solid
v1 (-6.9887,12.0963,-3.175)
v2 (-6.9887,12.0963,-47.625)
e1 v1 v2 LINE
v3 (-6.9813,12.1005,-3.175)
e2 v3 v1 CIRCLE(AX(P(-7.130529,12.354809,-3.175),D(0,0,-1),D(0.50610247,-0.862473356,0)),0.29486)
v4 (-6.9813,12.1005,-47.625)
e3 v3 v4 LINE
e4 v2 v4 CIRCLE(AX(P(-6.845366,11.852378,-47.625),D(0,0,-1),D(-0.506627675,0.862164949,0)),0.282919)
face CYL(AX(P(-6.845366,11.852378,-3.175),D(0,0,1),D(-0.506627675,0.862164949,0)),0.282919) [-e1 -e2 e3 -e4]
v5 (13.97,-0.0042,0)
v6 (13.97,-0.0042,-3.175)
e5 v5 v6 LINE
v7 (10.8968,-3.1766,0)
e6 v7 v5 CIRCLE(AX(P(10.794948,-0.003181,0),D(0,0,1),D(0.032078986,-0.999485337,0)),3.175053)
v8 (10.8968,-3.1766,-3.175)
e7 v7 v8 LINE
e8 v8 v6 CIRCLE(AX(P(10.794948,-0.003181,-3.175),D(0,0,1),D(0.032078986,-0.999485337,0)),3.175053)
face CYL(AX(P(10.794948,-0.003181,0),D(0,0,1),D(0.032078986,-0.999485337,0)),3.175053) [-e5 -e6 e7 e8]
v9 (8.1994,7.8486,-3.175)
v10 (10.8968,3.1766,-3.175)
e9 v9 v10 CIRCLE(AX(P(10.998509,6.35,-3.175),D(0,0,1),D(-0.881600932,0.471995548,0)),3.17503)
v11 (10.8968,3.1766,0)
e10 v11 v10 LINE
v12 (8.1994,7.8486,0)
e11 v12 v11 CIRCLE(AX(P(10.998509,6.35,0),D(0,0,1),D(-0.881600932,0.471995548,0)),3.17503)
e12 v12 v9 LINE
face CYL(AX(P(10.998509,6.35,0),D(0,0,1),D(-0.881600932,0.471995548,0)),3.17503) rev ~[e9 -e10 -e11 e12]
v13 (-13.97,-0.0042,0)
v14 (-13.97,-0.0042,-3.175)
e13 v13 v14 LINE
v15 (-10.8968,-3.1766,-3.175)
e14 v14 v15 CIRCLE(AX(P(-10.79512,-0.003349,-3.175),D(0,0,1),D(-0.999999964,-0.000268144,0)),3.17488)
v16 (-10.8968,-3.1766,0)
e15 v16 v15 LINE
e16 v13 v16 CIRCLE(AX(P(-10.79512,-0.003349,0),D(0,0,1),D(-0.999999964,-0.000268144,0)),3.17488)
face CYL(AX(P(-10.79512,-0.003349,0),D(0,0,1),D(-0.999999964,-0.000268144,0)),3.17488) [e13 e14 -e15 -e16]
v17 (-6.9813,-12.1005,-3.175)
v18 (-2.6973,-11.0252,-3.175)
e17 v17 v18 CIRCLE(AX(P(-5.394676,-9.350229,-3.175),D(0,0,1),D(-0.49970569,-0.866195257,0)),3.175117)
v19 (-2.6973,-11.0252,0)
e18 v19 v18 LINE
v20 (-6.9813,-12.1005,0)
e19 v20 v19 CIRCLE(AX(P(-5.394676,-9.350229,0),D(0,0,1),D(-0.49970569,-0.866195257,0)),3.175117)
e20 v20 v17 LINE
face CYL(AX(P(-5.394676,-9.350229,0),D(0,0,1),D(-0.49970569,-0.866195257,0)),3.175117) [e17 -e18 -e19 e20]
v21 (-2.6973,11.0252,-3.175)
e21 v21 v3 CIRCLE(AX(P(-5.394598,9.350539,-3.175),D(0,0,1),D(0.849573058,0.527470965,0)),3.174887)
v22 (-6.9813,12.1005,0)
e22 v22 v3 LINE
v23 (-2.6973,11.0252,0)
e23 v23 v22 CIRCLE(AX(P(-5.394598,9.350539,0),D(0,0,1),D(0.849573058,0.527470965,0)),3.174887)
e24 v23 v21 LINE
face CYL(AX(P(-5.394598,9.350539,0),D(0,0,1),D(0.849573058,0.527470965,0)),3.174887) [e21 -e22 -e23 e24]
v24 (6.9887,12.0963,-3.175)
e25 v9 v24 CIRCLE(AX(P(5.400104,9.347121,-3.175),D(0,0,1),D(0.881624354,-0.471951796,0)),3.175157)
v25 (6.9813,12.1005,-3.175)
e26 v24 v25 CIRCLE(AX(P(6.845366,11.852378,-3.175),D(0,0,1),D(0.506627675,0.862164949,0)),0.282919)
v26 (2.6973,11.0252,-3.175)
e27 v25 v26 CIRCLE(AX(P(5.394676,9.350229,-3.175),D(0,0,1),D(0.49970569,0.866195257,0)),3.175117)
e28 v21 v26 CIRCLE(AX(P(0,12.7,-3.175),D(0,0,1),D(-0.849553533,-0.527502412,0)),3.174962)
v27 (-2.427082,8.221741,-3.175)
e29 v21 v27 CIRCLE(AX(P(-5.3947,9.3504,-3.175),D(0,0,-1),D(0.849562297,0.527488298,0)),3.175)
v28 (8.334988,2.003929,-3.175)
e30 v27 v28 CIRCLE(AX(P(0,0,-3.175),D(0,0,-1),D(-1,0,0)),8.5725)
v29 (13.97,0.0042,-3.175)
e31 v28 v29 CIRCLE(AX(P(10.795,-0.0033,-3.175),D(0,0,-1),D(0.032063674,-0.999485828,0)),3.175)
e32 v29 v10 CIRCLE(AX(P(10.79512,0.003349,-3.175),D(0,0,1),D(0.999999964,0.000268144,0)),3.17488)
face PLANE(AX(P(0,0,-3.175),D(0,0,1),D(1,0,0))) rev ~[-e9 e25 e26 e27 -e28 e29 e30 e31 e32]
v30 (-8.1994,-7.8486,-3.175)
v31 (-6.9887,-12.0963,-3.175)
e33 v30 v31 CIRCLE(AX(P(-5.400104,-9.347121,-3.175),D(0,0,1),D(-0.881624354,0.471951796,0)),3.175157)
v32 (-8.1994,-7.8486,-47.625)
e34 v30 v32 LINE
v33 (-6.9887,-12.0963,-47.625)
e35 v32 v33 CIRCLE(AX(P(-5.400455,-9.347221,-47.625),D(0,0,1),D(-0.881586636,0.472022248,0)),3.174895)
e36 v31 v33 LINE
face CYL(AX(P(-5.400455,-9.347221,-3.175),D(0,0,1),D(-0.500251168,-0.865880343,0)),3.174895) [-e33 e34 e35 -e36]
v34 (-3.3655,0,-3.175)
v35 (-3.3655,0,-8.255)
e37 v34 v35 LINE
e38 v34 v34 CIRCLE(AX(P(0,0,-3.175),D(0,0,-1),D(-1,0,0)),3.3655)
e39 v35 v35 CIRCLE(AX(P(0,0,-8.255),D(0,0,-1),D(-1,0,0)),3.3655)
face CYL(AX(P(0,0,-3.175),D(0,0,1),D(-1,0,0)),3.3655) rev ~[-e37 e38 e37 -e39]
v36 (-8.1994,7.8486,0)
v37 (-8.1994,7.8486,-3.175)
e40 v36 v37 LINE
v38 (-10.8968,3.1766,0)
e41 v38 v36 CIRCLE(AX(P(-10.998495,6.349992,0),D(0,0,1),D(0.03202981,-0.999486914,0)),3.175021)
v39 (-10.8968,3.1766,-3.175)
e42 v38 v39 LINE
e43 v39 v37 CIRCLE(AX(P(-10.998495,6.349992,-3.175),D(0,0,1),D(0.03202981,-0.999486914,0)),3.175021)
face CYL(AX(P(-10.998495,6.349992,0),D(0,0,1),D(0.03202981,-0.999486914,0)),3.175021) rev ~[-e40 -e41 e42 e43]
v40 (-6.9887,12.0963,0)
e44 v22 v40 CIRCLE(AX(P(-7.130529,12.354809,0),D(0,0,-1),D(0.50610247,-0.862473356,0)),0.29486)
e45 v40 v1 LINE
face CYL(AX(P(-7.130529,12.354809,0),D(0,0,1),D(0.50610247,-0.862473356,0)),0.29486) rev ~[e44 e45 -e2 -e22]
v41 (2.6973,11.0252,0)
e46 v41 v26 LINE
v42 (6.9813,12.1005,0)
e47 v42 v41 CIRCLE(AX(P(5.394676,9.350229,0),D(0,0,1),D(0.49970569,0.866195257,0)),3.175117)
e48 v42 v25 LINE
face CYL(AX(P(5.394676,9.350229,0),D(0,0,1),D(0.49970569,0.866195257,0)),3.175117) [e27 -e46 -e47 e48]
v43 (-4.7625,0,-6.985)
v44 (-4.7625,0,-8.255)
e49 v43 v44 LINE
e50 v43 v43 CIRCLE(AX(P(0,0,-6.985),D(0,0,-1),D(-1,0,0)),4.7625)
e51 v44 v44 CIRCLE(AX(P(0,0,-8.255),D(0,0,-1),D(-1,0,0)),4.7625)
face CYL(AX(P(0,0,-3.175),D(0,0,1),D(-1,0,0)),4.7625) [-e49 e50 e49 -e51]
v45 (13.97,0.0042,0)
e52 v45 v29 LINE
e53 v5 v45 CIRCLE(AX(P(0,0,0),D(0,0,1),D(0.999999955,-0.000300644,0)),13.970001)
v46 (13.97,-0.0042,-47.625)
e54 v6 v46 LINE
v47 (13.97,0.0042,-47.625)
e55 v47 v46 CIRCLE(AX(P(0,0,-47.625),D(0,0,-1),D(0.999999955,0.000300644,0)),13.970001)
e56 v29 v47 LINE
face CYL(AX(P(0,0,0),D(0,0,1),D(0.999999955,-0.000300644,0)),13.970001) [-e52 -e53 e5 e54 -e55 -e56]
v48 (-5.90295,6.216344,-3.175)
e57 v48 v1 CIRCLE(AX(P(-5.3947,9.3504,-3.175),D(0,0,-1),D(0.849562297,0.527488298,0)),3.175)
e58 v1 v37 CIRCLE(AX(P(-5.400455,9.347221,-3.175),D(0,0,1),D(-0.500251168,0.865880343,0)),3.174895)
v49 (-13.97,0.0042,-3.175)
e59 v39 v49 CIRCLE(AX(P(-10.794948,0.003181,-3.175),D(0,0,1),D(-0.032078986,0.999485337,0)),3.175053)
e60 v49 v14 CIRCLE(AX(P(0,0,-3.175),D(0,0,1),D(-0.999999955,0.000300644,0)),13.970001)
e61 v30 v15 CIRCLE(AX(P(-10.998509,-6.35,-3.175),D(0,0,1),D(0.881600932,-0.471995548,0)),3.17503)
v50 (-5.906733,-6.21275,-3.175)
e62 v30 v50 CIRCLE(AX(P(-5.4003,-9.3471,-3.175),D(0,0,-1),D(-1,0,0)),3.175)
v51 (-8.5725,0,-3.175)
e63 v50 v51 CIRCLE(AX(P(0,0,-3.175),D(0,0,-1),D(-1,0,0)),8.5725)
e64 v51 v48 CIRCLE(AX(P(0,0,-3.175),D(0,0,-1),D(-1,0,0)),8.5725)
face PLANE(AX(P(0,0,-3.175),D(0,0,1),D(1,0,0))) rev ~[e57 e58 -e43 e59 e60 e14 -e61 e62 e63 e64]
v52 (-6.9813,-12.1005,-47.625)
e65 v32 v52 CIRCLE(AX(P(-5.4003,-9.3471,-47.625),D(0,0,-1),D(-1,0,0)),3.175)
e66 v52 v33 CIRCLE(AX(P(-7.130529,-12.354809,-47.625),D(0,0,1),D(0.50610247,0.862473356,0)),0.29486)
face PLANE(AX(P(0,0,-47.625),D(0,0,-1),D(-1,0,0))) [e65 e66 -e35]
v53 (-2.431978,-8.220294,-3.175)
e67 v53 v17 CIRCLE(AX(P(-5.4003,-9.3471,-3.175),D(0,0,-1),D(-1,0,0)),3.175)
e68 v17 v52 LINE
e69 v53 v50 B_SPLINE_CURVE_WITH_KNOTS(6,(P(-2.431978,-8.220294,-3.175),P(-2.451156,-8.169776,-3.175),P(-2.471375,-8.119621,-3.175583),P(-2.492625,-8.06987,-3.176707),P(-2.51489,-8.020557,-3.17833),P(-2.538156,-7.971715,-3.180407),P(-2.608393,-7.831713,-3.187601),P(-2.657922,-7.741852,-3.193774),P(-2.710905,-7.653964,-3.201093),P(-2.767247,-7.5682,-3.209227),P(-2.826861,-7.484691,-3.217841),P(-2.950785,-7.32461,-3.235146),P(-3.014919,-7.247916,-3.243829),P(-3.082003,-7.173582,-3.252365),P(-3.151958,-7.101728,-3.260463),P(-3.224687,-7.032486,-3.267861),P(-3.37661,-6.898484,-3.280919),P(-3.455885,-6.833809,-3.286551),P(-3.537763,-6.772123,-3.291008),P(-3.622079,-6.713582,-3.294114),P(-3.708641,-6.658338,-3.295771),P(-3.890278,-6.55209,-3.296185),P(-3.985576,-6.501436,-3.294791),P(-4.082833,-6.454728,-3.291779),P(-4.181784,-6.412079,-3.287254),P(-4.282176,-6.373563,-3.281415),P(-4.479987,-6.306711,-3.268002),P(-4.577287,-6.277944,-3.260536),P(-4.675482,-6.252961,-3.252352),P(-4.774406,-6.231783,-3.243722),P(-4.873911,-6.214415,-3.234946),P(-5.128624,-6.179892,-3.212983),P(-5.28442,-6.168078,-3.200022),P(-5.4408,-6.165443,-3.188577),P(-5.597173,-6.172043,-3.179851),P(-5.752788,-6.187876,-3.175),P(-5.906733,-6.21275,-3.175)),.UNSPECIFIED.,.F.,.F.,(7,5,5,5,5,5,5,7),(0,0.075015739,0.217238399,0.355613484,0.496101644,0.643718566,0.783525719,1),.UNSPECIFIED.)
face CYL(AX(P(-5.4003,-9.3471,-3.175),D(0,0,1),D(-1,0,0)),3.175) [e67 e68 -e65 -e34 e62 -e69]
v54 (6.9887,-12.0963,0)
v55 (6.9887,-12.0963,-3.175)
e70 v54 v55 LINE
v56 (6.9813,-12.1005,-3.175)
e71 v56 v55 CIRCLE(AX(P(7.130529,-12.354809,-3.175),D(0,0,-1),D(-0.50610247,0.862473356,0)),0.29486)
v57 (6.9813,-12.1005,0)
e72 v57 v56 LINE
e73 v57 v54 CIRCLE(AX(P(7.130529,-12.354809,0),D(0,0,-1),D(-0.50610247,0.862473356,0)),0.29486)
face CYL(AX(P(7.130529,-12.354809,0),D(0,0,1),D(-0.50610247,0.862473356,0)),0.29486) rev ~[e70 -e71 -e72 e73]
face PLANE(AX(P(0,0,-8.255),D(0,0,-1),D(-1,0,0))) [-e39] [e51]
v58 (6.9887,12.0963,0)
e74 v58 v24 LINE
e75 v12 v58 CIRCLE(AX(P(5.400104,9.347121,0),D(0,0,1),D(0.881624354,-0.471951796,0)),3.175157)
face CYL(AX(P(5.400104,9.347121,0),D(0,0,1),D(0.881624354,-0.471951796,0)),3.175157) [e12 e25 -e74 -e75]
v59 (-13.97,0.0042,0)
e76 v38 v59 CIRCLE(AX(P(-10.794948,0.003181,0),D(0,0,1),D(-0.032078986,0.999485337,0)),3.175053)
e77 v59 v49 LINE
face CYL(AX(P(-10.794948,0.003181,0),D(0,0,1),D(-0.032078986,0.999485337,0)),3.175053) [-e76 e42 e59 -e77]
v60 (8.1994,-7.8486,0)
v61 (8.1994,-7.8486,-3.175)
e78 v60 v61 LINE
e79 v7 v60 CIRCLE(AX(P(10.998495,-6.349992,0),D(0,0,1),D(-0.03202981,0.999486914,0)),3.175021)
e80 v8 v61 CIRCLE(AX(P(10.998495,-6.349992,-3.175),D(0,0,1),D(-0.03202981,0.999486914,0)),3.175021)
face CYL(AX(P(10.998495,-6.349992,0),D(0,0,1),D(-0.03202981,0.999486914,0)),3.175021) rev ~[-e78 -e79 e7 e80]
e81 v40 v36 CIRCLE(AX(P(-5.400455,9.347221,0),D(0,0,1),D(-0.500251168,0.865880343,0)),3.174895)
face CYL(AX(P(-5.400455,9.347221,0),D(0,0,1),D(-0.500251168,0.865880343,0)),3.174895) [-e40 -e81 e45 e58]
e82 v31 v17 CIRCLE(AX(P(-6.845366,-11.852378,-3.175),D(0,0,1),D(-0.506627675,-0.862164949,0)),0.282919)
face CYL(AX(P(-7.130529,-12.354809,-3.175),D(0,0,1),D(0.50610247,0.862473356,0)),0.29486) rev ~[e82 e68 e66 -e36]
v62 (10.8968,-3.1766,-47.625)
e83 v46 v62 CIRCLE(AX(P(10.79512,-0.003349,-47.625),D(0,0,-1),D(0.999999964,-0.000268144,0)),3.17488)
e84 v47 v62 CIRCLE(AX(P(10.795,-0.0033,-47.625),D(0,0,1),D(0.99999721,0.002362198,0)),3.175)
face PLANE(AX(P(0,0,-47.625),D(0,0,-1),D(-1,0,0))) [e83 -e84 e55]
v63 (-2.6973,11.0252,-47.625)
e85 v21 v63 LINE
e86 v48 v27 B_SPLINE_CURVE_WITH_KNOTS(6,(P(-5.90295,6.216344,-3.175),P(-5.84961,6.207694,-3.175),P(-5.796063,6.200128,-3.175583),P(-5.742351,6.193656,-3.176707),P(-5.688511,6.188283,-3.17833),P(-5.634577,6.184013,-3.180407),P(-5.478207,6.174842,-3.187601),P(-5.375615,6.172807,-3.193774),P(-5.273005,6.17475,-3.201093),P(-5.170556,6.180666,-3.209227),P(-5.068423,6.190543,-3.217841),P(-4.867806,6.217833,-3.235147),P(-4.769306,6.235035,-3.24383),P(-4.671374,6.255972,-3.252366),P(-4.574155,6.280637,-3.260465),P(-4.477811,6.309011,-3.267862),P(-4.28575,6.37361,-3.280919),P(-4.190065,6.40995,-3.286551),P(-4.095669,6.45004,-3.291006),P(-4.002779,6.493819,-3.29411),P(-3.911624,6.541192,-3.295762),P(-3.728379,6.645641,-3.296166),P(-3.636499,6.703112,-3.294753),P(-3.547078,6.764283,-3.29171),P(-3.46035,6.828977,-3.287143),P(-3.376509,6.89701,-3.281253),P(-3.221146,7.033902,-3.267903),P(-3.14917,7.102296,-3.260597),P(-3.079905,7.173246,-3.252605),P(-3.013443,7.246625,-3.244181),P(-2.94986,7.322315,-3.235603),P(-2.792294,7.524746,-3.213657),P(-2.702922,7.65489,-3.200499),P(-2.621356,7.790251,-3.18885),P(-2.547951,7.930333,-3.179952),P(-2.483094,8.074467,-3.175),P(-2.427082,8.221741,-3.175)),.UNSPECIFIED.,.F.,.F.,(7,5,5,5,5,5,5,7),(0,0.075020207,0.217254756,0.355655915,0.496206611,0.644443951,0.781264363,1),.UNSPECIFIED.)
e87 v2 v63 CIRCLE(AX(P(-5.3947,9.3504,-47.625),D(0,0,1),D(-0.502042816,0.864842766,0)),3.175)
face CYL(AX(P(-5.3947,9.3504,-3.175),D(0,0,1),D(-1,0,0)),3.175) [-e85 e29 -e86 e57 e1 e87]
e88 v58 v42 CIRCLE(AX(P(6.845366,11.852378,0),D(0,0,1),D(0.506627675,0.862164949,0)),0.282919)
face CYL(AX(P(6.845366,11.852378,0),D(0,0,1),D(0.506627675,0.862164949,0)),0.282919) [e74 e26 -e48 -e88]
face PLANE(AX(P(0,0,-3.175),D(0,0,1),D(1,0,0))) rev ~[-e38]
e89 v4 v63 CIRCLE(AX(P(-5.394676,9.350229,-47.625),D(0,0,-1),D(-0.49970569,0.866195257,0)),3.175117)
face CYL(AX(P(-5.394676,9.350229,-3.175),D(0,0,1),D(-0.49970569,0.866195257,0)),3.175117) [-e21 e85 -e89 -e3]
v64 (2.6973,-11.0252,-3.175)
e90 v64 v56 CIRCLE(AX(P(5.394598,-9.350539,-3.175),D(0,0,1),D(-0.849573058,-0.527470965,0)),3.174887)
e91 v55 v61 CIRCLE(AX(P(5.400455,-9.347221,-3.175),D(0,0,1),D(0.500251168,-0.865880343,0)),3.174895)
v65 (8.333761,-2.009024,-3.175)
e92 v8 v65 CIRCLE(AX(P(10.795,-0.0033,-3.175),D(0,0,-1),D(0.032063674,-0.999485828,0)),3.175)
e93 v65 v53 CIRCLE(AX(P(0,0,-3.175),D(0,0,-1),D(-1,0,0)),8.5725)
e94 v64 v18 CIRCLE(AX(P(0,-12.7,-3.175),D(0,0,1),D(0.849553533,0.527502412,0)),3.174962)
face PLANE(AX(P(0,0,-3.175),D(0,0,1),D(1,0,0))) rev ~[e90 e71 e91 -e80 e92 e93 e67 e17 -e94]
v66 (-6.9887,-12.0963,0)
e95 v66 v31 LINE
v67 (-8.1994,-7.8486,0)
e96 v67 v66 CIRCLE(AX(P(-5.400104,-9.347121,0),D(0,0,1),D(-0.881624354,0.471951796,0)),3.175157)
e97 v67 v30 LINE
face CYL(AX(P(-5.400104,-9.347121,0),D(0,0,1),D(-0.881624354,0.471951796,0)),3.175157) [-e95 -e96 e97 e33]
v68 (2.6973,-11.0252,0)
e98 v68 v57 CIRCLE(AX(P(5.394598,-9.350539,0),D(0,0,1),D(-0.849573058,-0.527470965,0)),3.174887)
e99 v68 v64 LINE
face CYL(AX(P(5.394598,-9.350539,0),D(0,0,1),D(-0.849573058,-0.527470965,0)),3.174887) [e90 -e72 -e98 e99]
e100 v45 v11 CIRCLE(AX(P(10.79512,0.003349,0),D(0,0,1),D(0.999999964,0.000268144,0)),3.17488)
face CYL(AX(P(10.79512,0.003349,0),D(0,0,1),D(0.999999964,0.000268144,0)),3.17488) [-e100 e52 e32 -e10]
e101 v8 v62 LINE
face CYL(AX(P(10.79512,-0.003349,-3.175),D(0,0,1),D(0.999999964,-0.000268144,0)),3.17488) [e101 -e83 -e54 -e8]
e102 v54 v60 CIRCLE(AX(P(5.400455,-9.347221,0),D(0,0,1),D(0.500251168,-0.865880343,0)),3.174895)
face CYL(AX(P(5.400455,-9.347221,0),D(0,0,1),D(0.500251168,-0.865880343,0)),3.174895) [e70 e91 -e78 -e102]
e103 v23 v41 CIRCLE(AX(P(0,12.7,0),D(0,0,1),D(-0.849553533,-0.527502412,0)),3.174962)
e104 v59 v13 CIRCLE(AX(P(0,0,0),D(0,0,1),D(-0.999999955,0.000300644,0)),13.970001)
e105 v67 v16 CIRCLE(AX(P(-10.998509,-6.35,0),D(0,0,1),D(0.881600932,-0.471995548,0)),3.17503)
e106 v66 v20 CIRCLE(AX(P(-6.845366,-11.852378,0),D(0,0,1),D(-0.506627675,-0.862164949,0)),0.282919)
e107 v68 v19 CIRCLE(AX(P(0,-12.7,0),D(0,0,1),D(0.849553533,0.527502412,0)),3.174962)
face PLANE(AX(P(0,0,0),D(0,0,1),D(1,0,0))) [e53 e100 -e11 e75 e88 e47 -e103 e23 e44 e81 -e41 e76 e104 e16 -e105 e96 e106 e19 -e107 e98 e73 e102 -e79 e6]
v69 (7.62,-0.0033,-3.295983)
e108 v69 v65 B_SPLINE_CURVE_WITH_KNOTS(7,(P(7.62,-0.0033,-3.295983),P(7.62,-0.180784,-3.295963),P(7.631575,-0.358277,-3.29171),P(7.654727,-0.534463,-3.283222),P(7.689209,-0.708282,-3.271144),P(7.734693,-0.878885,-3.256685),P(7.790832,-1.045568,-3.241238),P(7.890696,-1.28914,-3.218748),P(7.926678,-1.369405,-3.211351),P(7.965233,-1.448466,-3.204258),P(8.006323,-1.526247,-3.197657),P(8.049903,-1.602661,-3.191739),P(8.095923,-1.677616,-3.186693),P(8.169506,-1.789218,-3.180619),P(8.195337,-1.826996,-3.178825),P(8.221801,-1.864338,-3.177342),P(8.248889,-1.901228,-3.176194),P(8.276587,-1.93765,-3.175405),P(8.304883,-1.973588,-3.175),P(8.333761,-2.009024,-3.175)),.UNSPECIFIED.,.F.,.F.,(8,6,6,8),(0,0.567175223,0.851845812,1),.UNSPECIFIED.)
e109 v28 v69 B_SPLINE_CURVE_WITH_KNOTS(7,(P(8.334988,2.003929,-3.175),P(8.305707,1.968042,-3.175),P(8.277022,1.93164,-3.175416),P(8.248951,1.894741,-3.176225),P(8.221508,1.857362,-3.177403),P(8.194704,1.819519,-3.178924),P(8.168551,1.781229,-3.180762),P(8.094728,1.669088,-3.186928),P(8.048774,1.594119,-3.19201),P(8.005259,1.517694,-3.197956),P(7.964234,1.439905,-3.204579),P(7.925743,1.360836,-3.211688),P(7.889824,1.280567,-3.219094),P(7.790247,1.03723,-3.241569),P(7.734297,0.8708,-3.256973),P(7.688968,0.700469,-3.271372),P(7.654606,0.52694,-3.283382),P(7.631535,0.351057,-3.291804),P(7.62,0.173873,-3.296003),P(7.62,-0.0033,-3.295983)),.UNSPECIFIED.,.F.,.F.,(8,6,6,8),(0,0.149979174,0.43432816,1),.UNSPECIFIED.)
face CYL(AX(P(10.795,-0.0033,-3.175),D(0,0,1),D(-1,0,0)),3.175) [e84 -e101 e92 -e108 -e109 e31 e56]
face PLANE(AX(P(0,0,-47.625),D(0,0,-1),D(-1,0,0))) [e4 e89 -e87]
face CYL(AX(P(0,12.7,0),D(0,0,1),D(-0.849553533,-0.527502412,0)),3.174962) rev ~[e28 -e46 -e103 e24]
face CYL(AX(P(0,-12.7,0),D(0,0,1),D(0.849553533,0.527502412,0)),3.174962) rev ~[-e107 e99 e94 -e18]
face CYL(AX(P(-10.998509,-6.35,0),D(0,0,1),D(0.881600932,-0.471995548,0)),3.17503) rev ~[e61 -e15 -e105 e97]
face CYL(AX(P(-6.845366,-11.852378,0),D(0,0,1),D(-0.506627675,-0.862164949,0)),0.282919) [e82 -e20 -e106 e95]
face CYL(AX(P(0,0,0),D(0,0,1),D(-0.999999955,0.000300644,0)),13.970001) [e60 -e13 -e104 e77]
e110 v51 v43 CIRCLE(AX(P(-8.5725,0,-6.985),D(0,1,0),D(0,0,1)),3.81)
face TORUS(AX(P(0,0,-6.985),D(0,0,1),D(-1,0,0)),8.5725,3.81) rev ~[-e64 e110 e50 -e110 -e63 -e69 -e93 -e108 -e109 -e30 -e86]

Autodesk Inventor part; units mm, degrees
ref_plane "YZ Plane" through (0, 0, 0) normal (1, 0, 0) x (0, 1, 0)
ref_plane "XZ Plane" through (0, 0, 0) normal (0, 1, 0) x (-1, 0, 0)
ref_plane "XY Plane" through (0, 0, 0) normal (0, 0, 1) x (1, 0, 0)
sketch "Sketch2" plane through (0, 0, 0) normal (0, 0, 1) x (1, 0, 0)
  arc A0 (8.1994, 7.8486) -> (6.9887, 12.0963) centre (5.4003, 9.3471) ccw
  arc A1 (6.9887, 12.0963) -> (6.9813, 12.1005) centre (0, 0) ccw
  arc A2 (6.9813, 12.1005) -> (2.6973, 11.0252) centre (5.3947, 9.3504) ccw
  arc A3 (-2.6973, 11.0252) -> (2.6973, 11.0252) centre (0, 12.7) ccw
  arc A4 (-2.6973, 11.0252) -> (-6.9813, 12.1005) centre (-5.3947, 9.3504) ccw
  arc A5 (-6.9813, 12.1005) -> (-6.9887, 12.0963) centre (0, 0) ccw
  arc A6 (-6.9887, 12.0963) -> (-8.1994, 7.8486) centre (-5.4003, 9.3471) ccw
  arc A7 (-10.8968, 3.1766) -> (-8.1994, 7.8486) centre (-10.9985, 6.35) ccw
  arc A8 (-10.8968, 3.1766) -> (-13.97, 0.0042) centre (-10.795, 0.0033) ccw
  arc A9 (-13.97, 0.0042) -> (-13.97, -0.0042) centre (0, 0) ccw
  arc A10 (-13.97, -0.0042) -> (-10.8968, -3.1766) centre (-10.795, -0.0033) ccw
  arc A11 (-8.1994, -7.8486) -> (-10.8968, -3.1766) centre (-10.9985, -6.35) ccw
  arc A12 (-8.1994, -7.8486) -> (-6.9887, -12.0963) centre (-5.4003, -9.3471) ccw
  arc A13 (-6.9887, -12.0963) -> (-6.9813, -12.1005) centre (0, 0) ccw
  arc A14 (-6.9813, -12.1005) -> (-2.6973, -11.0252) centre (-5.3947, -9.3504) ccw
  arc A15 (2.6973, -11.0252) -> (-2.6973, -11.0252) centre (0, -12.7) ccw
  arc A16 (2.6973, -11.0252) -> (6.9813, -12.1005) centre (5.3947, -9.3504) ccw
  arc A17 (6.9813, -12.1005) -> (6.9887, -12.0963) centre (0, 0) ccw
  arc A18 (6.9887, -12.0963) -> (8.1994, -7.8486) centre (5.4003, -9.3471) ccw
  arc A19 (10.8968, -3.1766) -> (8.1994, -7.8486) centre (10.9985, -6.35) ccw
  arc A20 (10.8968, -3.1766) -> (13.97, -0.0042) centre (10.795, -0.0033) ccw
  arc A21 (13.97, -0.0042) -> (13.97, 0.0042) centre (0, 0) ccw
  arc A22 (13.97, 0.0042) -> (10.8968, 3.1766) centre (10.795, 0.0033) ccw
  arc A23 (8.1994, 7.8486) -> (10.8968, 3.1766) centre (10.9985, 6.35) ccw
  circle A24 centre (0, 0) radius 1.5875
extrude "Extrusion1" add sketch "Sketch2" against normal blind 3.175 contours A23 A22 A21 A20 A19 A18 A17 A16 A15 A14 A13 A12 A11 A10 A9 A8 A7 A6 A5 A4 A3 A2 A1 A0 | A24
sketch "Sketch3" plane through (0, 0, -3.175) normal (0, 0, -1) x (-1, 0, 0)
  circle A0 centre (0, 0) radius 3.3655
  circle A1 centre (0, 0) radius 4.7625
  dimension "d11" = 6.731
  dimension "d12" = 9.525
extrude "Extrusion2" add sketch "Sketch3" along normal blind 5.08
sketch "Sketch4" plane through (0, 0, -3.175) normal (0, 0, -1) x (-1, 0, 0)
  arc A0 (-6.9887, 12.0963) -> (-8.1994, 7.8486) centre (-5.4003, 9.3471) ccw projected
  arc A1 (-10.8968, 3.1766) -> (-8.1994, 7.8486) centre (-10.9985, 6.35) ccw projected
  arc A2 (-10.8968, 3.1766) -> (-13.97, 0.0042) centre (-10.795, 0.0033) ccw projected
  arc A3 (-13.97, 0.0042) -> (-13.97, -0.0042) centre (0, 0) ccw projected
  arc A4 (-13.97, -0.0042) -> (-10.8968, -3.1766) centre (-10.795, -0.0033) ccw projected
  arc A5 (-8.1994, -7.8486) -> (-10.8968, -3.1766) centre (-10.9985, -6.35) ccw projected
  arc A6 (-8.1994, -7.8486) -> (-6.9887, -12.0963) centre (-5.4003, -9.3471) ccw projected
  arc A7 (-6.9887, -12.0963) -> (-6.9813, -12.1005) centre (0, 0) ccw projected
  arc A8 (-6.9813, -12.1005) -> (-2.6973, -11.0252) centre (-5.3947, -9.3504) ccw projected
  arc A9 (2.6973, -11.0252) -> (-2.6973, -11.0252) centre (0, -12.7) ccw projected
  arc A10 (2.6973, -11.0252) -> (6.9813, -12.1005) centre (5.3947, -9.3504) ccw projected
  arc A11 (6.9813, -12.1005) -> (6.9887, -12.0963) centre (0, 0) ccw projected
  arc A12 (6.9887, -12.0963) -> (8.1994, -7.8486) centre (5.4003, -9.3471) ccw projected
  arc A13 (10.8968, -3.1766) -> (8.1994, -7.8486) centre (10.9985, -6.35) ccw projected
  arc A14 (10.8968, -3.1766) -> (13.97, -0.0042) centre (10.795, -0.0033) ccw projected
  arc A15 (13.97, -0.0042) -> (13.97, 0.0042) centre (0, 0) ccw projected
  arc A16 (13.97, 0.0042) -> (10.8968, 3.1766) centre (10.795, 0.0033) ccw projected
  arc A17 (8.1994, 7.8486) -> (10.8968, 3.1766) centre (10.9985, 6.35) ccw projected
  arc A18 (8.1994, 7.8486) -> (6.9887, 12.0963) centre (5.4003, 9.3471) ccw projected
  arc A19 (6.9887, 12.0963) -> (6.9813, 12.1005) centre (0, 0) ccw projected
  arc A20 (6.9813, 12.1005) -> (2.6973, 11.0252) centre (5.3947, 9.3504) ccw projected
  arc A21 (-2.6973, 11.0252) -> (2.6973, 11.0252) centre (0, 12.7) ccw projected
  arc A22 (-2.6973, 11.0252) -> (-6.9813, 12.1005) centre (-5.3947, 9.3504) ccw projected
  arc A23 (-6.9813, 12.1005) -> (-6.9887, 12.0963) centre (0, 0) ccw projected
  circle A24 centre (0, 0) radius 4.7625 projected
  circle A25 centre (-10.795, -0.0033) radius 3.175
  circle A26 centre (5.3947, 9.3504) radius 3.175
  circle A27 centre (5.4003, -9.3471) radius 3.175
extrude "Extrusion4" add sketch "Sketch4" along normal blind 44.45 contours A25 A4 A3 | A20 A19 A26 | A27 A12 A11
fillet "Fillet1" radius 3.81 1 edges at (4.7625, 0, -3.175)
properties part number "FixedCylinderWireStorageInsert" material "ABS Plastic"
